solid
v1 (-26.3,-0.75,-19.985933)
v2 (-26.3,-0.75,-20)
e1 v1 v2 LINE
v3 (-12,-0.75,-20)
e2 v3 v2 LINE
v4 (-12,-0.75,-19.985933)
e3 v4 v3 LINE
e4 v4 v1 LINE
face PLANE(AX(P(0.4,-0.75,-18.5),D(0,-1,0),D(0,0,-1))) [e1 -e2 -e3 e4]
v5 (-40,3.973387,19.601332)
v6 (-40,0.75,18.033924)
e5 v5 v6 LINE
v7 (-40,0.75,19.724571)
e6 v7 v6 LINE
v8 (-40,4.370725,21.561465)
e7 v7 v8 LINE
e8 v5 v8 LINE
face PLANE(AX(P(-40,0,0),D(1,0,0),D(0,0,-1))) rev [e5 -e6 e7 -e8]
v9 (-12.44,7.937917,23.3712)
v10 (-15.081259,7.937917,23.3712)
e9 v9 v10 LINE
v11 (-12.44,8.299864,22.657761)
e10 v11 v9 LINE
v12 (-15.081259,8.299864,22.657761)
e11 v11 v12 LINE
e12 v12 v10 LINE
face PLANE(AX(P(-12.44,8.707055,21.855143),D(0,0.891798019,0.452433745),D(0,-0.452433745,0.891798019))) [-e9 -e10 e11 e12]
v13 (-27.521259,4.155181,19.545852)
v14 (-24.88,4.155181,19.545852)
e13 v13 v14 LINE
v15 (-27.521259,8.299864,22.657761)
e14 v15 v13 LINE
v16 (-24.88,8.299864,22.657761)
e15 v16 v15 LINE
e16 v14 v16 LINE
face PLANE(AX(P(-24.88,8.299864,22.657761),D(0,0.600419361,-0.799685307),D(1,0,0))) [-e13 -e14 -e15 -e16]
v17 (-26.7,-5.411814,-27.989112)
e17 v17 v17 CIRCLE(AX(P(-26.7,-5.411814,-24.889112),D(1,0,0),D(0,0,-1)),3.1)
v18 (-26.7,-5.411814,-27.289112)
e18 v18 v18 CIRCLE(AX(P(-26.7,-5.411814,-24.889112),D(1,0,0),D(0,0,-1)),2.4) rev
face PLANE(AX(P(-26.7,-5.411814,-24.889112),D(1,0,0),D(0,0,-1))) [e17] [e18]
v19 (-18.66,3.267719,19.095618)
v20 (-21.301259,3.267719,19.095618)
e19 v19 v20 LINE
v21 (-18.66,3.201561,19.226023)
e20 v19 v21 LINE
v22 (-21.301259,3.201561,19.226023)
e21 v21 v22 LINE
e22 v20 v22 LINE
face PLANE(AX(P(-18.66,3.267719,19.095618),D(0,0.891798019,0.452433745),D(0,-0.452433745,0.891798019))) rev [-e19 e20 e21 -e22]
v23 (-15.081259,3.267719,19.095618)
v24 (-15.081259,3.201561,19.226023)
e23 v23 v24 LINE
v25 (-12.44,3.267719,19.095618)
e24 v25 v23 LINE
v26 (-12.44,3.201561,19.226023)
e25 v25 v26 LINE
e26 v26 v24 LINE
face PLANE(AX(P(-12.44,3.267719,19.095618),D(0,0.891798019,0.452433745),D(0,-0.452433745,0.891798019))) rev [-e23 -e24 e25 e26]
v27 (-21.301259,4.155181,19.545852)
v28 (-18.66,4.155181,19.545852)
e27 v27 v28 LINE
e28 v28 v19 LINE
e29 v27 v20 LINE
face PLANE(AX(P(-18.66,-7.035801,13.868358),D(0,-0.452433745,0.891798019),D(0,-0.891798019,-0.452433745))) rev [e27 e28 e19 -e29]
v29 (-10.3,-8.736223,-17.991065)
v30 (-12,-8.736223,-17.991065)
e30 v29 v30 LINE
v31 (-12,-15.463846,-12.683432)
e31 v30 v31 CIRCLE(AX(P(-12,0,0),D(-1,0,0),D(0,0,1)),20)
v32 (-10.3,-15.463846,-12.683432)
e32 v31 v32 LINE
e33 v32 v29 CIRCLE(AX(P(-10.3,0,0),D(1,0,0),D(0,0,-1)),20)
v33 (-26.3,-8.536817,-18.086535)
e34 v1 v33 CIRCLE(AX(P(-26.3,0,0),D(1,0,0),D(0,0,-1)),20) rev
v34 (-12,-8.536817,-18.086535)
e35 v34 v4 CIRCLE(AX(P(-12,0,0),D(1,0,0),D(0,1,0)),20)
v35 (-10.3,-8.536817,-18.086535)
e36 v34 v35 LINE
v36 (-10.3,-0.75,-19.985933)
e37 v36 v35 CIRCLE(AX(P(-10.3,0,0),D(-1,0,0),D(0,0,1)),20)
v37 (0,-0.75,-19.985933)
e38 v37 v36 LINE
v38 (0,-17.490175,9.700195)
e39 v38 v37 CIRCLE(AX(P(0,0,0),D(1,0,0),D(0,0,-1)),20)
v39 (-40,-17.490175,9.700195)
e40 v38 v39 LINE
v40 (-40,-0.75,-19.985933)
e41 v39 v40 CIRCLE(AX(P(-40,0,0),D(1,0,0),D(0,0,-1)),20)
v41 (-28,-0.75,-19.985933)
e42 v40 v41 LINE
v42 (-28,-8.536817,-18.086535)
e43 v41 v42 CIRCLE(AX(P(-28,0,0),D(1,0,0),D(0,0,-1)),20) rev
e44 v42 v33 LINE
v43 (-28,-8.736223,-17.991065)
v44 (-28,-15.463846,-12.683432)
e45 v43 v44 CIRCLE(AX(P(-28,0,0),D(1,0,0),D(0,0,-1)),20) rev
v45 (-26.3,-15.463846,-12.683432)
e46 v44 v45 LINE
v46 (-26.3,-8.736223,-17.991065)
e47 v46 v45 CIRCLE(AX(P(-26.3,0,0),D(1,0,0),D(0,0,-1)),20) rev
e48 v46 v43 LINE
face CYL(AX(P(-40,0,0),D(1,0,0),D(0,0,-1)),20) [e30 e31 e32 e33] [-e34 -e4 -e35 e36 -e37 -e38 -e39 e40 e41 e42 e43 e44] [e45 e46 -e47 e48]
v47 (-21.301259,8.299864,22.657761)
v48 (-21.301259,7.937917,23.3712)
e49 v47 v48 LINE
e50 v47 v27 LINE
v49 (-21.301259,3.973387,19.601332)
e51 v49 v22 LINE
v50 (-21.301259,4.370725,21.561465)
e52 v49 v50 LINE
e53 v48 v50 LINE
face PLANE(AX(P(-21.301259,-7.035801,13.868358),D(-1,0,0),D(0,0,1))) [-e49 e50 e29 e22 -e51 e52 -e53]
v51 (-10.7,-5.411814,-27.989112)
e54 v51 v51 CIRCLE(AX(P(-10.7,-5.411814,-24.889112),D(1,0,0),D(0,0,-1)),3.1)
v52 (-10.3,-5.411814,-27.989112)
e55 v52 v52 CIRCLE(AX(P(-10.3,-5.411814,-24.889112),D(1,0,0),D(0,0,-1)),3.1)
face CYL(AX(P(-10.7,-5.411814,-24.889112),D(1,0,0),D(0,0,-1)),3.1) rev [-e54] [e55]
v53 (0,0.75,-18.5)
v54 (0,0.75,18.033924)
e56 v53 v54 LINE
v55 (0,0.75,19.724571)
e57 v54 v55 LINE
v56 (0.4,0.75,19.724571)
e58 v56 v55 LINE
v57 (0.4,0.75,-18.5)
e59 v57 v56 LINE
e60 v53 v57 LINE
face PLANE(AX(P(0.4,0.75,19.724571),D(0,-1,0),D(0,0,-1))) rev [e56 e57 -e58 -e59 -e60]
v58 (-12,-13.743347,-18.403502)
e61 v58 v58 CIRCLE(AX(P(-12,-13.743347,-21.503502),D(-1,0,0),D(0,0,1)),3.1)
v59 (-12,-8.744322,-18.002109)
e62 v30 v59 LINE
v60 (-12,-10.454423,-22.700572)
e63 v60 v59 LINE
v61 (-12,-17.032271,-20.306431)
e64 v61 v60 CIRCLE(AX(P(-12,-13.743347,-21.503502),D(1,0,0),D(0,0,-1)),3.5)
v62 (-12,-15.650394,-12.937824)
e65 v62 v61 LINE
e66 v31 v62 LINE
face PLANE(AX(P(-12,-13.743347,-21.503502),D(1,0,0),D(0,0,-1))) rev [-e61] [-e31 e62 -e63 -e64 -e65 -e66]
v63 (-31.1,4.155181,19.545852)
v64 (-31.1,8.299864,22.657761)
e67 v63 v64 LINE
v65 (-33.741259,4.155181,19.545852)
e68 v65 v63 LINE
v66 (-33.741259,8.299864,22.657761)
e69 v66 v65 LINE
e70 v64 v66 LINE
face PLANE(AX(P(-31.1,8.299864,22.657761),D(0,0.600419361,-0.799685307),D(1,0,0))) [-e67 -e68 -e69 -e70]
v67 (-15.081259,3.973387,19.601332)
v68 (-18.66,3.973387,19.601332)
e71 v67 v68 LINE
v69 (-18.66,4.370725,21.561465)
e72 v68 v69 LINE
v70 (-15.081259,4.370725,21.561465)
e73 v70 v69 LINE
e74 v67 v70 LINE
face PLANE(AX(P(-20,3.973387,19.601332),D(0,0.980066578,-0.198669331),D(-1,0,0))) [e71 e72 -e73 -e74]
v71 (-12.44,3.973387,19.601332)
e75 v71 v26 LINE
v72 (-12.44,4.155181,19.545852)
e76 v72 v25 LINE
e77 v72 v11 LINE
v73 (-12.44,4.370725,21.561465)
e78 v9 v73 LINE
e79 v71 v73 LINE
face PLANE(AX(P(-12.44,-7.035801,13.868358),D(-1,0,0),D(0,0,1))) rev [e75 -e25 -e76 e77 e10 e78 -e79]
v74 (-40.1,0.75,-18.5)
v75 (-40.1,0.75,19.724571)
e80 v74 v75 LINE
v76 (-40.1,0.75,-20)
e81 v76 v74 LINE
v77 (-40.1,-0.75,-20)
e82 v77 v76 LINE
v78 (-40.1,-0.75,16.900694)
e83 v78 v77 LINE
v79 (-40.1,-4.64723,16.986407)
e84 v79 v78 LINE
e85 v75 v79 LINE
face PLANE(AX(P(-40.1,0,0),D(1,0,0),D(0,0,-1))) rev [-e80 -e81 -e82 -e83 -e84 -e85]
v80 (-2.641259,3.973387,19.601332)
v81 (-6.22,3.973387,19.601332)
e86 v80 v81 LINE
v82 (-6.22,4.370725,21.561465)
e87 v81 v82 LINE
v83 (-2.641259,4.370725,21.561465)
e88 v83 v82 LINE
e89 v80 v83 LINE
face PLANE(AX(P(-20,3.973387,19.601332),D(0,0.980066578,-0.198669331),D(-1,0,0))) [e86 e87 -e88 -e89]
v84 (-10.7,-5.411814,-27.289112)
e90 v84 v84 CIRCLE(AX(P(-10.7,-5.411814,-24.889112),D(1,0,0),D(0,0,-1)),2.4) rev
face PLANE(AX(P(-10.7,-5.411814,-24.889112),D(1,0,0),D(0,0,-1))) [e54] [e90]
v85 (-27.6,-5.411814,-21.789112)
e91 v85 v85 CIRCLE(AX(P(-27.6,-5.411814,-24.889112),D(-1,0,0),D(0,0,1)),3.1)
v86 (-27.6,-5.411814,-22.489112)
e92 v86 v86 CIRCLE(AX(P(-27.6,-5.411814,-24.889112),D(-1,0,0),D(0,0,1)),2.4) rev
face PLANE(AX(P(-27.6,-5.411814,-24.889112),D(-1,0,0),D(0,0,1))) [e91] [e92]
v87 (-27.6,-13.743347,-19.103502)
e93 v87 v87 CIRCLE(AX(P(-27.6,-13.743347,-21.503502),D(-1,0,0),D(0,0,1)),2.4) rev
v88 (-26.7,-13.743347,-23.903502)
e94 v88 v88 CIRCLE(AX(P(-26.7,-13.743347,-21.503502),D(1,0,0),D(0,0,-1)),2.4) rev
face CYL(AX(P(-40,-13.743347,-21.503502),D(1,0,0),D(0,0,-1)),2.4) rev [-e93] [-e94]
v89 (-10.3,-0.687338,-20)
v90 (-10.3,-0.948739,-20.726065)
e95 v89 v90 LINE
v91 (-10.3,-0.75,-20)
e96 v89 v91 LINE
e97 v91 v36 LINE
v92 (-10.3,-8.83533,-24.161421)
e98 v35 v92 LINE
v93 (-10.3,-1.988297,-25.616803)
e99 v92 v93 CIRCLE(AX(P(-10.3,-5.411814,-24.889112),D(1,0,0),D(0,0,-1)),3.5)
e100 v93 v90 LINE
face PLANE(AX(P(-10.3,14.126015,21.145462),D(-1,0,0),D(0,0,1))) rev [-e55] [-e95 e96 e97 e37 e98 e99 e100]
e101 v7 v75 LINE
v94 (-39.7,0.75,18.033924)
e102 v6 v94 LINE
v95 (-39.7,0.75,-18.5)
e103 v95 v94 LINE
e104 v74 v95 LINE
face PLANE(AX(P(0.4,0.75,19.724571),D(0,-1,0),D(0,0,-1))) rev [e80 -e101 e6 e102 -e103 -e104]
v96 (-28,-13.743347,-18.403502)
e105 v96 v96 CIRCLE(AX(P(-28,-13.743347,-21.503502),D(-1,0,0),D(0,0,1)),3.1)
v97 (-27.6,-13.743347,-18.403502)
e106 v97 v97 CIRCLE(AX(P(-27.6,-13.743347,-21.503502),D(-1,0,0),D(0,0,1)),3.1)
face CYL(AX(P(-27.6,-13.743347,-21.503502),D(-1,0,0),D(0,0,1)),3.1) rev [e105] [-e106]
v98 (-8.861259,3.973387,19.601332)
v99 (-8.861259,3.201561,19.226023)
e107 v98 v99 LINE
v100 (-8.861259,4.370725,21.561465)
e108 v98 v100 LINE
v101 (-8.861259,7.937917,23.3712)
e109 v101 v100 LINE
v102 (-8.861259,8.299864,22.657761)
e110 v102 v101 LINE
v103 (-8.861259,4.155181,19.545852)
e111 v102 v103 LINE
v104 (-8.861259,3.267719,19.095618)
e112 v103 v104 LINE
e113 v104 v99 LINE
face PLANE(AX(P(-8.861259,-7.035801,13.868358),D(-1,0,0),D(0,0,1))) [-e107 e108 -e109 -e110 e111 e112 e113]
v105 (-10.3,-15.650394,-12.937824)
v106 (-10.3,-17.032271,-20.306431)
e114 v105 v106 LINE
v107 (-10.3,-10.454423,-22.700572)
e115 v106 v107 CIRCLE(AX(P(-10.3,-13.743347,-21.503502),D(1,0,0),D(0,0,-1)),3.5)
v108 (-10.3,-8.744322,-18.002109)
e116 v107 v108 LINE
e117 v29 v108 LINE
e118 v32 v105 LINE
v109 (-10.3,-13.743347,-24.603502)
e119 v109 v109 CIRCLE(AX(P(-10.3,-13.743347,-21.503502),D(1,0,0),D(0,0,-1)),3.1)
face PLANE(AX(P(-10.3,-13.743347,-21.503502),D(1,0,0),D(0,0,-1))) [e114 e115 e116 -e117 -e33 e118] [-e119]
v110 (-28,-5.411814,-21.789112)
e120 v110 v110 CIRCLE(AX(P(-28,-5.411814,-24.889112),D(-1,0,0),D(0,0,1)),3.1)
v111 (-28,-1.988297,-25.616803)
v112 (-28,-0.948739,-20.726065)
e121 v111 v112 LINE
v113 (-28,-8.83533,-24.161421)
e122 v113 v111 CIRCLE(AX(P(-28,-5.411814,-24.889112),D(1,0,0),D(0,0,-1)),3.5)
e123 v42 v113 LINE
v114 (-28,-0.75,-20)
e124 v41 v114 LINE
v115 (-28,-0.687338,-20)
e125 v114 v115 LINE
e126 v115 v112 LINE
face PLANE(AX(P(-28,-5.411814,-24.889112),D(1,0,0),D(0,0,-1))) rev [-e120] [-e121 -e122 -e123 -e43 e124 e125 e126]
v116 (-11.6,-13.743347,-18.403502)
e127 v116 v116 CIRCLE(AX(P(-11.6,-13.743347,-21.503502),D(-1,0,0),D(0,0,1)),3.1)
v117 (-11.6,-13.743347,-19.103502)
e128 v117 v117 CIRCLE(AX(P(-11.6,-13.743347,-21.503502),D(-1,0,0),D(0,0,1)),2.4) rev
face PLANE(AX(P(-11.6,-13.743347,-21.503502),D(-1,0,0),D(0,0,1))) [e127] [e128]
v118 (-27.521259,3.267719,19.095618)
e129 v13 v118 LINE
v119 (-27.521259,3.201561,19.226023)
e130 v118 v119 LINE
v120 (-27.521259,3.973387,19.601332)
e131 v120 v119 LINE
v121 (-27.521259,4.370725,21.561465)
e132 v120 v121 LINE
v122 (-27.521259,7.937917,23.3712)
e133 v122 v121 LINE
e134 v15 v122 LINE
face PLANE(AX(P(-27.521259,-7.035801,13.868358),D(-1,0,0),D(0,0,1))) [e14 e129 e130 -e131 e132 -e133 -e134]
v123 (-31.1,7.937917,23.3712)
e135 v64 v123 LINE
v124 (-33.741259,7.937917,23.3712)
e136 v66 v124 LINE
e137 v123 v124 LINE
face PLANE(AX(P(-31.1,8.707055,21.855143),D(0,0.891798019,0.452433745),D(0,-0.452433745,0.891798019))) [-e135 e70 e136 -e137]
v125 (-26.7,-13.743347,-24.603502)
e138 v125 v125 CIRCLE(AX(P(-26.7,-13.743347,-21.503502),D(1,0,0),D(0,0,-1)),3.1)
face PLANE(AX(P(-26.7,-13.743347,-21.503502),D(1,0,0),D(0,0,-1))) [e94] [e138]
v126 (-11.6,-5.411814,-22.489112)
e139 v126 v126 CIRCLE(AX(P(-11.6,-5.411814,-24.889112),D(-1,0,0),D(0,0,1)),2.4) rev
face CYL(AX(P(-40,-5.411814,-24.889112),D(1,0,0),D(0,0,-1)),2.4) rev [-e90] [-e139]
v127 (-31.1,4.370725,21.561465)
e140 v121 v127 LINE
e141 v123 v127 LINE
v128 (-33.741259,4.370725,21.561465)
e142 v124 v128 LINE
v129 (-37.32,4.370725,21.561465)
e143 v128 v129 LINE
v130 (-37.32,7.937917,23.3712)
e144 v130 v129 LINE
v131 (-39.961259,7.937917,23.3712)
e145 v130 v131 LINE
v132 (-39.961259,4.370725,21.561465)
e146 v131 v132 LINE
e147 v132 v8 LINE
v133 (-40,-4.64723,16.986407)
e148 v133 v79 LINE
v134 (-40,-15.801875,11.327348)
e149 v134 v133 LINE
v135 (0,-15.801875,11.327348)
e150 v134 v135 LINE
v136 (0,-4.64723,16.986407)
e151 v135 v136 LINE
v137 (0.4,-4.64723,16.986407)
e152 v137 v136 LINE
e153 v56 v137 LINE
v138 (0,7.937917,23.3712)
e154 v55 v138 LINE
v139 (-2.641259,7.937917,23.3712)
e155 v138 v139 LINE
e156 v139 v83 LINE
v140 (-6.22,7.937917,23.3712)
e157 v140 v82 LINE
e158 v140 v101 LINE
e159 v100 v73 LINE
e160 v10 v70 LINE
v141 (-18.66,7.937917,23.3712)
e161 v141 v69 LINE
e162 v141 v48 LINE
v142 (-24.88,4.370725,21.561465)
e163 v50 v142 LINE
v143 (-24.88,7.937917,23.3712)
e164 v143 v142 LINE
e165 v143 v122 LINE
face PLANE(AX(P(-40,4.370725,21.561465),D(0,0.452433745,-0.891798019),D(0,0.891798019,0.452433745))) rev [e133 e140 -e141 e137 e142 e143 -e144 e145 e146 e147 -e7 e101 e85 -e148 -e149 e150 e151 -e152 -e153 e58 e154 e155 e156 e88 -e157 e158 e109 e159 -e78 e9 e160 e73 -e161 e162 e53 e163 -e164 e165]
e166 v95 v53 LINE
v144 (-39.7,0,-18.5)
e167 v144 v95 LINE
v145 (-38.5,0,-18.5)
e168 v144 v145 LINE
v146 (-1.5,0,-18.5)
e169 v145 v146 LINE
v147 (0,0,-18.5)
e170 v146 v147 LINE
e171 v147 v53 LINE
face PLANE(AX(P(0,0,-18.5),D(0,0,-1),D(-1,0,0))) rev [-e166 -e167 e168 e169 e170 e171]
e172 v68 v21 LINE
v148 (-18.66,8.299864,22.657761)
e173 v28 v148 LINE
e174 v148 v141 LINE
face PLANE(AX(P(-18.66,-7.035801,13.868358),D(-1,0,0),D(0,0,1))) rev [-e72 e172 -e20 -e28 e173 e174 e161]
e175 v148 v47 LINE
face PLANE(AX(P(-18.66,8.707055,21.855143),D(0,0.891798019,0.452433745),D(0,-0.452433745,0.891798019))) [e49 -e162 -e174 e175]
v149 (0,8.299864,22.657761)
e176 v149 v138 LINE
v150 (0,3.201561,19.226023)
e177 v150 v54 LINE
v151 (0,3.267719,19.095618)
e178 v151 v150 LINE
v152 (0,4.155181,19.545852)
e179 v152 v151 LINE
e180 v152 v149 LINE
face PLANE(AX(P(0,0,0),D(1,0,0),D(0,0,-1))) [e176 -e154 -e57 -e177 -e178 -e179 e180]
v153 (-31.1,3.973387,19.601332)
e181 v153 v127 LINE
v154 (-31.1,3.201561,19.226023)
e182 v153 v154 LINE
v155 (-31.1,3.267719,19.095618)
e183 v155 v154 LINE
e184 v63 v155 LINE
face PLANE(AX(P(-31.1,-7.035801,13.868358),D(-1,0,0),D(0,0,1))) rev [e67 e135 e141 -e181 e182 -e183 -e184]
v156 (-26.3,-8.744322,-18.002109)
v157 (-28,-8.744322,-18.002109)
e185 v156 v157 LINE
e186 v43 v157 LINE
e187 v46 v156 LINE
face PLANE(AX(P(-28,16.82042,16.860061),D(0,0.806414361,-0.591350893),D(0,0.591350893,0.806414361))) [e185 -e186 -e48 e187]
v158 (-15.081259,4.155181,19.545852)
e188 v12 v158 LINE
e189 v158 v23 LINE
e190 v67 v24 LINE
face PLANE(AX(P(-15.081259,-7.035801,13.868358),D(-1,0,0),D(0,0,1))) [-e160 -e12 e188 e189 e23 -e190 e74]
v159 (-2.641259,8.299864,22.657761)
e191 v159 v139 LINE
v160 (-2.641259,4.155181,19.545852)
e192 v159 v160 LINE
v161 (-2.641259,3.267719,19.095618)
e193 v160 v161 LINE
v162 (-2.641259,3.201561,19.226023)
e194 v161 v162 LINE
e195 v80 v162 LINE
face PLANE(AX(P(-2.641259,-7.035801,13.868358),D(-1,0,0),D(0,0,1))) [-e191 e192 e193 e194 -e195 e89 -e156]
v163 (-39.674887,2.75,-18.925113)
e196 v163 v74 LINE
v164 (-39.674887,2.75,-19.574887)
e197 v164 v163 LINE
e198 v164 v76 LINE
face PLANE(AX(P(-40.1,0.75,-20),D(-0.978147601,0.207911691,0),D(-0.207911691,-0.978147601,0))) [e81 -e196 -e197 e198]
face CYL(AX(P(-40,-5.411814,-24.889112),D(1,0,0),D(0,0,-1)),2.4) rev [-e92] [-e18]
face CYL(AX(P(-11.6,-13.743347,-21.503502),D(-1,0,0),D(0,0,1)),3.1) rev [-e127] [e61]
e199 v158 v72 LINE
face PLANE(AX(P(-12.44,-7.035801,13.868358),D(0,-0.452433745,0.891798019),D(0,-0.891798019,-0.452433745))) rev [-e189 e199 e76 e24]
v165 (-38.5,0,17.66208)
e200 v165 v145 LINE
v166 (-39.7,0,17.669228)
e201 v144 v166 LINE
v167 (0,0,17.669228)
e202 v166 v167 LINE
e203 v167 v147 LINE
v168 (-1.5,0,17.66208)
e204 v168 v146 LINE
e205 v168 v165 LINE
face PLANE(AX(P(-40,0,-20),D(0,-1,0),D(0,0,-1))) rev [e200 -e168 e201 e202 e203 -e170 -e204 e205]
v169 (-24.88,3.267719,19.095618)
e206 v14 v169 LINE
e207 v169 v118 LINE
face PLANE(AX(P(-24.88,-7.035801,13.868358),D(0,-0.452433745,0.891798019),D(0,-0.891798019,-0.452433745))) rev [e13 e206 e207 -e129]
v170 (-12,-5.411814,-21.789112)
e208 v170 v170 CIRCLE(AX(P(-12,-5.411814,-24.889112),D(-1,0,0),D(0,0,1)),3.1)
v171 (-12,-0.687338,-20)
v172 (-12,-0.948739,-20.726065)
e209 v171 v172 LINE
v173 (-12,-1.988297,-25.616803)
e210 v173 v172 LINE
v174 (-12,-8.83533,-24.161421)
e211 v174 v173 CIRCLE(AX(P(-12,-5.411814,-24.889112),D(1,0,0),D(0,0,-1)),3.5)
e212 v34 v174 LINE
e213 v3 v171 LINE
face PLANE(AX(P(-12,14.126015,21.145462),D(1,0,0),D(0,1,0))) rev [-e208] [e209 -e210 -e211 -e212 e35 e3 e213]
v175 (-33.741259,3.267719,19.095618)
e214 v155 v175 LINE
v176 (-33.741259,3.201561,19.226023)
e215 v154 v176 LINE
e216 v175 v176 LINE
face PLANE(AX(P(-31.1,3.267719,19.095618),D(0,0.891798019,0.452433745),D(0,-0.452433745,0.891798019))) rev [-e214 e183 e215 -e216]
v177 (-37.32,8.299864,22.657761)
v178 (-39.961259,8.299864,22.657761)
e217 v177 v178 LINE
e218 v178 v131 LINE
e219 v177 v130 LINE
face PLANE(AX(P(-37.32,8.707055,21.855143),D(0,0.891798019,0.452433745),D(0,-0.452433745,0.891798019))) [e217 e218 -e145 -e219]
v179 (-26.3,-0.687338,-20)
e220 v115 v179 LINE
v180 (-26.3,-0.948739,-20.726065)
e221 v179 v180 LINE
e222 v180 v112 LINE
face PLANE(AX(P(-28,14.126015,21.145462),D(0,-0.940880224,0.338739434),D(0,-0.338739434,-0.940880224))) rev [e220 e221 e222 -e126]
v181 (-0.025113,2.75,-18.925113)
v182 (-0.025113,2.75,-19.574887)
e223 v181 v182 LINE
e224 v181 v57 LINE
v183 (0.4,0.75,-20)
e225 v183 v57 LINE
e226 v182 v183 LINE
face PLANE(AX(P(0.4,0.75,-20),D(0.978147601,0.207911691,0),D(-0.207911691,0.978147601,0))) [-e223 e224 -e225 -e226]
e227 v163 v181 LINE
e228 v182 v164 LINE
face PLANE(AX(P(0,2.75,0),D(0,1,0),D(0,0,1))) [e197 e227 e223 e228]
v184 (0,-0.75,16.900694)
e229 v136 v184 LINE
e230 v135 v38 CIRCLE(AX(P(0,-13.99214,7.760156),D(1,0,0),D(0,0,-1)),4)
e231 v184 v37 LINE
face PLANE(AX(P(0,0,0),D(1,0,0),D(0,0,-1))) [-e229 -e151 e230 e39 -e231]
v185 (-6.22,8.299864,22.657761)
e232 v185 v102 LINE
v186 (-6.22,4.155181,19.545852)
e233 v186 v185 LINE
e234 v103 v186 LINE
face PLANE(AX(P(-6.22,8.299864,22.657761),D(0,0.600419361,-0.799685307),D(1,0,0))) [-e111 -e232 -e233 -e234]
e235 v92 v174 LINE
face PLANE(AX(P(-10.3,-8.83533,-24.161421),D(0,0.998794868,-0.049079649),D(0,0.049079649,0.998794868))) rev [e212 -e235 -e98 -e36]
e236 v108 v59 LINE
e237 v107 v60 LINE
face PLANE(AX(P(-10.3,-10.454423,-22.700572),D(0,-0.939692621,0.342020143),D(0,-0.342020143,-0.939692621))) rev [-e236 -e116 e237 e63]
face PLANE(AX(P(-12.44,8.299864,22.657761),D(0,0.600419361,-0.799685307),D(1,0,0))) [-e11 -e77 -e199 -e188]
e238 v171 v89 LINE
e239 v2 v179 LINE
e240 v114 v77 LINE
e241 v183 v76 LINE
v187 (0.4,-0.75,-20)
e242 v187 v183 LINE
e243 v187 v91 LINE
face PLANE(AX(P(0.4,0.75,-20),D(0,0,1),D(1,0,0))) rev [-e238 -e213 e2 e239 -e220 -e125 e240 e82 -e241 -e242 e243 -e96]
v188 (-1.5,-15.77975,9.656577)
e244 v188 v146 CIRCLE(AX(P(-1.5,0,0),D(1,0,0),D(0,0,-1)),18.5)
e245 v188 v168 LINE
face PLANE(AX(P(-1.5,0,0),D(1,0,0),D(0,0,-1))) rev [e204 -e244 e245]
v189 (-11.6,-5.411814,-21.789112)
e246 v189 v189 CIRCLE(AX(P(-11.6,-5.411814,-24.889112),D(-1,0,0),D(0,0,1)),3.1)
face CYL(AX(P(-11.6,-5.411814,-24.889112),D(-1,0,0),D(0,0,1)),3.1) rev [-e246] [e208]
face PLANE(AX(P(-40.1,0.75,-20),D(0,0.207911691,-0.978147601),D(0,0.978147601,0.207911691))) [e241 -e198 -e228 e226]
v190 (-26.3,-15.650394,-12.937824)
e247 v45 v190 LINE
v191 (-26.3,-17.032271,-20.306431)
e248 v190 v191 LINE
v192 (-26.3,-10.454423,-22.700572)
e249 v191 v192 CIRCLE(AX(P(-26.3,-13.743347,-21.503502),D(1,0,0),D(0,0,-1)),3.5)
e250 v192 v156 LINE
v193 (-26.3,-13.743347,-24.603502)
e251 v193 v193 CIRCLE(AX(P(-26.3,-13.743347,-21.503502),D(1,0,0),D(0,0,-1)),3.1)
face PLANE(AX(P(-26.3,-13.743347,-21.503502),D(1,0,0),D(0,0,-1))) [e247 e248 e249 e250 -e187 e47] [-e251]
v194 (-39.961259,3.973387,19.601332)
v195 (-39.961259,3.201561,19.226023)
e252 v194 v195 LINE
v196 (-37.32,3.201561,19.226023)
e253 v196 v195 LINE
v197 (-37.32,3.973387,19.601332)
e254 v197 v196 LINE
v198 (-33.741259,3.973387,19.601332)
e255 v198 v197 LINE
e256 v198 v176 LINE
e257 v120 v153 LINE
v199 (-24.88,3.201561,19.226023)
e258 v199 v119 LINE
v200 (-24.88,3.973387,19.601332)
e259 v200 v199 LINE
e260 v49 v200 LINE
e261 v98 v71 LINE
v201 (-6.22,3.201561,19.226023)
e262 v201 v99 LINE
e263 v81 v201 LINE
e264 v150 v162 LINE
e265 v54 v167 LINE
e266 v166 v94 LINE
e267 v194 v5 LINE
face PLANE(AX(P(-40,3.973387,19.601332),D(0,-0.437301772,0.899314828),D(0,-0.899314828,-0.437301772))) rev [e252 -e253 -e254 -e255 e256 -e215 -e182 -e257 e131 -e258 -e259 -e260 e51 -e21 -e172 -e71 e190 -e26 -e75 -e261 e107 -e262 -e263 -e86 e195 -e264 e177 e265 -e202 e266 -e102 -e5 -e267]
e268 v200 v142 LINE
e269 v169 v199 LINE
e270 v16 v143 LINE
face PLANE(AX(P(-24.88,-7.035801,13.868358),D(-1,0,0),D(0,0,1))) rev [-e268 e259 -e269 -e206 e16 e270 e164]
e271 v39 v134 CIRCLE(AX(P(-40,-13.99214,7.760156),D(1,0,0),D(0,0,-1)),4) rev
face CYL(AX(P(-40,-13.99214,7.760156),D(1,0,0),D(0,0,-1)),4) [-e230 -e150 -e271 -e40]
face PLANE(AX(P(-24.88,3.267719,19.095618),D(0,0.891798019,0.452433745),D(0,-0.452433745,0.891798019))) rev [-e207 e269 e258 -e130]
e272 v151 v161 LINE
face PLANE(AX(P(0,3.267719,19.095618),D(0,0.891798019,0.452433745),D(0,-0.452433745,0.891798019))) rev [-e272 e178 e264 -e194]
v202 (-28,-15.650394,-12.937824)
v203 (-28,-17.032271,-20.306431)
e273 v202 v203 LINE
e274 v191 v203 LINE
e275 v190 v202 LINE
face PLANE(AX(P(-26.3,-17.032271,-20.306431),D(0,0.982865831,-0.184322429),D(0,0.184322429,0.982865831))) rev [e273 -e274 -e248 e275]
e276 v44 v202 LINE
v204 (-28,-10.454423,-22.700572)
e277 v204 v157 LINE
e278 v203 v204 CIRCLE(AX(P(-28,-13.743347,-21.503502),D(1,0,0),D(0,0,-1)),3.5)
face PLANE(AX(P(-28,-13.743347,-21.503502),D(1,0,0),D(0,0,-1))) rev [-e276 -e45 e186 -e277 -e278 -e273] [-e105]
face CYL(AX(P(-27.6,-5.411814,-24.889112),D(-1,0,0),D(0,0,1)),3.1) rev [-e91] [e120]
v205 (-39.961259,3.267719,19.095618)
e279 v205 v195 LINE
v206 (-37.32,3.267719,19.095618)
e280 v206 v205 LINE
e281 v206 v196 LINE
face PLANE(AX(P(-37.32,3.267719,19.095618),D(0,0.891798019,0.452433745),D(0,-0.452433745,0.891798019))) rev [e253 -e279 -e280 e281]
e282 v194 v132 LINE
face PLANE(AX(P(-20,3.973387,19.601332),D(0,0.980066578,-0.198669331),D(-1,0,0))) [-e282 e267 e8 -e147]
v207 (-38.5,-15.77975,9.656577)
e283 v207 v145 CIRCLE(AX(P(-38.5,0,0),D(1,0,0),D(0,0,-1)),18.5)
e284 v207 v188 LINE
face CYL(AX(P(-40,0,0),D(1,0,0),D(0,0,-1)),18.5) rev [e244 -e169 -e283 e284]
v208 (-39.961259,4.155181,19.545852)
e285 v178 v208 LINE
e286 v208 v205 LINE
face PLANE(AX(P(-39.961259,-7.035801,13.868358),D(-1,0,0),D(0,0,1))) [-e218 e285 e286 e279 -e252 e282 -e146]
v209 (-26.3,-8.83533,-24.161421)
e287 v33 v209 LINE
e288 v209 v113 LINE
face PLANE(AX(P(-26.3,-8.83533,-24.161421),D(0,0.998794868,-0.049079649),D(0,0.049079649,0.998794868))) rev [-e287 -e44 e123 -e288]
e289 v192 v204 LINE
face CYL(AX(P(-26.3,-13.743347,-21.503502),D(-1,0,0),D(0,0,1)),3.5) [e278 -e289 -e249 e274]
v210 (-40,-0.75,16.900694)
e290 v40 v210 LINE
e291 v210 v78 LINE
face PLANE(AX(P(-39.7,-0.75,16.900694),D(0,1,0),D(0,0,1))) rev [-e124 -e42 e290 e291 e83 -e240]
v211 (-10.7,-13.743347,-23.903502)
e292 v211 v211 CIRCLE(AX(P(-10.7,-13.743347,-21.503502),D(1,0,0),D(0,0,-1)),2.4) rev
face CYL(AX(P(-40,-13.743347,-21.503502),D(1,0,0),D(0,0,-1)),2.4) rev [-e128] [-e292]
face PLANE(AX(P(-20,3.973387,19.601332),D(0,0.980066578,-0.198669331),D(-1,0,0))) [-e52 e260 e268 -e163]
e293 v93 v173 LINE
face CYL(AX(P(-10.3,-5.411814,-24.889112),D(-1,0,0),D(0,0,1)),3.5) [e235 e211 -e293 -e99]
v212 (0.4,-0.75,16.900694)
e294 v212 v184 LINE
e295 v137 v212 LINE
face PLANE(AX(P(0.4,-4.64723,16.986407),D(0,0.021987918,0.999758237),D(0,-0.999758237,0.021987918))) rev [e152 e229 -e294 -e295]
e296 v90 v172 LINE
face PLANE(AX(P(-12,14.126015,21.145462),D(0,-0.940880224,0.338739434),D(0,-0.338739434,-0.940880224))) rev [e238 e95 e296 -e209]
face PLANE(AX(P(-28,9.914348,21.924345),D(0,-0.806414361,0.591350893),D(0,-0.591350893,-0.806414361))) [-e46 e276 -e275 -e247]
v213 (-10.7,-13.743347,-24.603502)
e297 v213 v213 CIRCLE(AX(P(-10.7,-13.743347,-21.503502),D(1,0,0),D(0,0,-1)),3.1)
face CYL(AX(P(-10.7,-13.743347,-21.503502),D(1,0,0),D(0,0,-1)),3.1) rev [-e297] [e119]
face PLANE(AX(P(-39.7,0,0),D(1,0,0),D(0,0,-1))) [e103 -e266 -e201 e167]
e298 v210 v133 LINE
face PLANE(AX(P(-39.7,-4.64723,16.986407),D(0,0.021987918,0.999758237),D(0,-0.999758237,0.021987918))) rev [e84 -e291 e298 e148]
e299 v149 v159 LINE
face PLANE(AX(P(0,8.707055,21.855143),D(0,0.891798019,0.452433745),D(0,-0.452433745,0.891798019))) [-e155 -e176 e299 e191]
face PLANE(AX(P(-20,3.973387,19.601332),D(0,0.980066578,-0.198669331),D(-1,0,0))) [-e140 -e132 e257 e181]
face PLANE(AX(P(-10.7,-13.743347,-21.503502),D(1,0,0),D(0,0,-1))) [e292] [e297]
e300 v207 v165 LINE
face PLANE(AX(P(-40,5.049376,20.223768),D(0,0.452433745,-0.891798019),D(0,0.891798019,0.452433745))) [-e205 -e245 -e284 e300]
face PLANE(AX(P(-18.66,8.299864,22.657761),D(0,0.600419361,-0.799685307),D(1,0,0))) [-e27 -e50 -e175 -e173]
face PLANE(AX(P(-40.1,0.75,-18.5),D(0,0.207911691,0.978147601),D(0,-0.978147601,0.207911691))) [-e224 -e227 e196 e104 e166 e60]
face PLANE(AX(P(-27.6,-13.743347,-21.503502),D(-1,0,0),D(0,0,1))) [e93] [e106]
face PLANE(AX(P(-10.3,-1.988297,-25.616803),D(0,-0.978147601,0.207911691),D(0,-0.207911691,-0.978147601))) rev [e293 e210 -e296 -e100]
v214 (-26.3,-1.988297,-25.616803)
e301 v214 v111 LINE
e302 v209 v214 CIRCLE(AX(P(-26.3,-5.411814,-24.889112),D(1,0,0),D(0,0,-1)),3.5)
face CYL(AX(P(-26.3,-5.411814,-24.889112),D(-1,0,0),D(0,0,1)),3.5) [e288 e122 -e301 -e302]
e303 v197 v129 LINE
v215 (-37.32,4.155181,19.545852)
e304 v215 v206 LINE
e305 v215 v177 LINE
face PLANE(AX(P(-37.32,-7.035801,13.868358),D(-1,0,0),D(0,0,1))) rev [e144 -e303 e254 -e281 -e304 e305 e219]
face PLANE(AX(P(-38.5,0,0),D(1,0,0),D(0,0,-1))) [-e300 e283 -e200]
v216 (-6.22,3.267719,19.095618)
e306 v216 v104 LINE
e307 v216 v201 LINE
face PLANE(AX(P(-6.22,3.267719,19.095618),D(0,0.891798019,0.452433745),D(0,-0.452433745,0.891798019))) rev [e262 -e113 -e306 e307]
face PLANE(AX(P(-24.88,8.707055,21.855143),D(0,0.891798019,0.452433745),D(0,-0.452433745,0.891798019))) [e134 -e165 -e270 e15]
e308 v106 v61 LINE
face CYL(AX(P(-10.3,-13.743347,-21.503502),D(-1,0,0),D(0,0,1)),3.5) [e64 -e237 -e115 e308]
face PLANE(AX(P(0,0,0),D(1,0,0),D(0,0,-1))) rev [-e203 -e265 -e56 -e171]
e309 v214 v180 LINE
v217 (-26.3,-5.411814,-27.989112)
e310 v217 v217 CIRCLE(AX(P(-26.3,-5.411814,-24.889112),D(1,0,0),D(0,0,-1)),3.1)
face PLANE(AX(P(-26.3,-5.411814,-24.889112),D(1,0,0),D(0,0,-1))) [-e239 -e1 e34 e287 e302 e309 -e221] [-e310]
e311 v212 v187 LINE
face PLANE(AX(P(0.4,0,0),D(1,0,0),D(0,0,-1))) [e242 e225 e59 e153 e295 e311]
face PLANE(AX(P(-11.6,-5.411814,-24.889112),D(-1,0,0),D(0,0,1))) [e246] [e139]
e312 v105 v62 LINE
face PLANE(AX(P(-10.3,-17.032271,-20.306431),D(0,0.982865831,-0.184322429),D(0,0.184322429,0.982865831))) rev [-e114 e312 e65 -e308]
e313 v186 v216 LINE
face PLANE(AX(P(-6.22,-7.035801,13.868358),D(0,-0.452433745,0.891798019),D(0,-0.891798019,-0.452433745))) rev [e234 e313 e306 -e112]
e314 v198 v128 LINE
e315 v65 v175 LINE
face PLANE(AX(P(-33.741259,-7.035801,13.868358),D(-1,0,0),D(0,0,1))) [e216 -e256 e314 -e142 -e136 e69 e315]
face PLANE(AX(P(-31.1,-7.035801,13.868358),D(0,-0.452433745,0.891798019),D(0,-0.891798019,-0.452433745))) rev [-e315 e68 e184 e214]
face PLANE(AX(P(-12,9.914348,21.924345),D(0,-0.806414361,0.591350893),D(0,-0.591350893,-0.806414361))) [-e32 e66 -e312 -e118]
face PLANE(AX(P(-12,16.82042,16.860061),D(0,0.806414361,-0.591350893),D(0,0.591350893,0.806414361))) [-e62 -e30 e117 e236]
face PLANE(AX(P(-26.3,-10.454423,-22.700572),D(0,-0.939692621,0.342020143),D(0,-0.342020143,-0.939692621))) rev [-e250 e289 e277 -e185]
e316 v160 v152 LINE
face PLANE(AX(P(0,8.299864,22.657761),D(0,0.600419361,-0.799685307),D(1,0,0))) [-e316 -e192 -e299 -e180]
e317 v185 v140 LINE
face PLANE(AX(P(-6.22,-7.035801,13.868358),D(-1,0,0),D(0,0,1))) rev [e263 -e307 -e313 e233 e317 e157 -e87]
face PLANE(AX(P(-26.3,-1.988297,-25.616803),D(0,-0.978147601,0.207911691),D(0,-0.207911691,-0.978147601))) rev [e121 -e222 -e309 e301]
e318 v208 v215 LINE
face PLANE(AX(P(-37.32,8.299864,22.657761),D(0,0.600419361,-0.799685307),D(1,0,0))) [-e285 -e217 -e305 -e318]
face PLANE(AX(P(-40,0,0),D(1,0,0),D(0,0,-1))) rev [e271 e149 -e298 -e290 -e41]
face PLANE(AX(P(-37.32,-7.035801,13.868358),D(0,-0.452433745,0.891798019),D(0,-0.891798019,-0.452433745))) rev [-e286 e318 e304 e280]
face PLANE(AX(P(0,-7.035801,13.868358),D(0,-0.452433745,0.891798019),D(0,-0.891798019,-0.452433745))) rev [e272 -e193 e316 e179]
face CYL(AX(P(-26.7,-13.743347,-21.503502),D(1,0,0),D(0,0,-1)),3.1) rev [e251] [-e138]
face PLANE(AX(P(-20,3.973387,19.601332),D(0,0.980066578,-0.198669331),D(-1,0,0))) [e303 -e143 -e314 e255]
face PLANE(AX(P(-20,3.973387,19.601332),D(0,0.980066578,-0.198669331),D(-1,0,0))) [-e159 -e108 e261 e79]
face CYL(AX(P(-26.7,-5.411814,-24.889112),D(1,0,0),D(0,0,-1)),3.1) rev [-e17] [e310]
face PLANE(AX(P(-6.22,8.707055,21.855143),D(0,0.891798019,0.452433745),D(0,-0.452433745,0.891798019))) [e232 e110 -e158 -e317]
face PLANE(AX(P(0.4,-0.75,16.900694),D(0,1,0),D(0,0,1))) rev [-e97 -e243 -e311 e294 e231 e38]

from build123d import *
from OCP.BRepFilletAPI import BRepFilletAPI_MakeChamfer

# Parameters (mm, degrees)
SKETCH1_R                    = 20
BOSS_EXTRUDE1_DEPTH          = 40
WRAP6_SECTION_W              = 2
WRAP6_SECTION_H              = 40
WRAP6_ANGLE                  = 68.754935416
CUT_EXTRUDE3_DEPTH           = 40
CUT_EXTRUDE4_DEPTH           = 40
SHELL1_START                 = -38.5
SHELL1_DEPTH                 = 37
BOSS_EXTRUDE6_DEPTH          = 1.7
CHAMFER3_SIZE2               = 5.104153638
CHAMFER3_SIZE                = 0.9
LPATTERN3_COUNT              = 7
LPATTERN3_PITCH              = 6.22
CHAMFER3_OF_LPATTERN3_SIZE   = 0.9
CHAMFER3_OF_LPATTERN3_SIZE_2 = 5.104153638
BOSS_EXTRUDE9_DEPTH          = 1.7
BOSS_EXTRUDE10_DEPTH         = 1.7
BOSS_EXTRUDE11_REACH         = 61.927
BOSS_EXTRUDE11_END_RADIUS    = 20
SKETCH26_W                   = 1.7
SKETCH26_H                   = 8.060132267
BOSS_EXTRUDE12_REACH         = 61.482
BOSS_EXTRUDE12_END_RADIUS    = 20
SKETCH31_W                   = 1.7
SKETCH31_H                   = 8.563925154
SKETCH35_R                   = 2.4
CUT_EXTRUDE5_DEPTH           = 46.6949855
SKETCH36_R                   = 3.1
CUT_EXTRUDE6_DEPTH           = 0.4
CUT_EXTRUDE7_START           = -0.4
SKETCH37_R                   = 3.1
CUT_EXTRUDE7_DEPTH           = 0.4
LPATTERN4_COUNT              = 2
LPATTERN4_PITCH              = 16
FILLET1_R                    = 4
BOSS_EXTRUDE13_DEPTH         = 0.4
LPATTERN5_COUNT              = 2
LPATTERN5_PITCH              = 40.1
SKETCH39_W                   = 40.5
SKETCH39_H                   = 1.5
BOSS_EXTRUDE14_DEPTH         = 1.5
SKETCH40_W                   = 40.5
SKETCH40_H                   = 1.5
BOSS_EXTRUDE15_DEPTH         = 2
BOSS_EXTRUDE15_TAPER         = 12


# Read off the part's stored shape, not the designer's step: Shell1
with BuildPart() as part:
    # Sketch1 → Boss-Extrude1 (new body)
    with BuildSketch(Plane(origin=(0, 0, 0), x_dir=(0, 0, -1), z_dir=(1, 0, 0))):
        Circle(SKETCH1_R)
    extrude(amount=-BOSS_EXTRUDE1_DEPTH)

    # Wrap6 section (on wrap section) → Wrap6 (revolve)
    with BuildSketch(Plane(origin=(0, 0, 0), x_dir=(0, 0.19866933079506122, 0.9800665778412416), z_dir=(0, 0.9800665778412416, -0.19866933079506122))):
        with Locations((21, -20)):
            Rectangle(WRAP6_SECTION_W, WRAP6_SECTION_H)
    revolve(axis=Axis((0, 0, 0), (1, 0, 0)), revolution_arc=WRAP6_ANGLE)

    # Sketch7 → Cut-Extrude3 (cut)
    with BuildSketch(Plane(origin=(0, 0, 0), x_dir=(0, 0, -1), z_dir=(1, 0, 0))):
        Polygon((-21.561464713, 4.370725277), (-10.806046117, -16.829419696), (-13.2224557, -32.299256077), (-33.361013034, 4.370725277), align=None)
    extrude(amount=-CUT_EXTRUDE3_DEPTH, mode=Mode.SUBTRACT)

    # Sketch8 → Cut-Extrude4 (cut)
    with BuildSketch(Plane(origin=(0, 0, 0), x_dir=(0, 0, -1), z_dir=(1, 0, 0))):
        with BuildLine():
            Line((-19.601331557, 3.973386616), (-17.669228411, 0))
            Line((-17.669228411, 0), (20, 0))
            ThreePointArc((20, 0), (1.996668333, 19.900083306), (-19.601331557, 3.973386616))
        make_face()
    extrude(amount=-CUT_EXTRUDE4_DEPTH, mode=Mode.SUBTRACT)

    # Shell1 outline → Shell1 (cut)
    with BuildSketch(Plane.YZ.offset(SHELL1_START)):
        with BuildLine():
            Line((0, 17.662079948), (-15.779750214, 9.656577198))
            ThreePointArc((-15.779750214, 9.656577198), (-16.138411913, -9.044427064), (0, -18.5))
            Line((0, -18.5), (0, 17.662079948))
        make_face()
    extrude(amount=SHELL1_DEPTH, mode=Mode.SUBTRACT)

    # Sketch17 → Boss-Extrude6 (add)
    with BuildSketch(Plane(origin=(0, -7.804938117, 15.384414667), x_dir=(1, 0, 0), z_dir=(0, -0.4524337453692514, 0.8917980186405168))):
        Polygon((-2.641259026, 11.553646958), (0, 11.553646958), (0, 13.652938378), (0, 17.652938378), (-2.641259026, 17.652938378), align=None)
    boss_extrude6 = extrude(amount=-BOSS_EXTRUDE6_DEPTH)

    # Chamfer3
    chamfer3_edges = [part.edges().sort_by_distance(p)[0] for p in [
        (-1.320629513, 8.707054719, 21.855143062),
    ]]
    chamfer3_side = [part.faces().sort_by_distance(p)[0] for p in [
        (-1.320629513, 8.698910912, 21.871195427),
    ]]
    chamfer(chamfer3_edges, length=CHAMFER3_SIZE - 0.0001, length2=CHAMFER3_SIZE2 - 0.0001, reference=chamfer3_side[0])  # a hair under: the kernel refuses the full size

    # LPattern3: Boss-Extrude6 ×7
    with Locations(*[(-i * LPATTERN3_PITCH, 0, 0) for i in range(1, LPATTERN3_COUNT)]):
        add(boss_extrude6)

    # Chamfer3 of LPattern3
    chamfer3_of_lpattern3_edges_1 = [part.edges().sort_by_distance(p)[0] for p in [
        (-7.540629513, 8.707054719, 21.855143062),
    ]]
    chamfer3_of_lpattern3_side_1 = [part.faces().sort_by_distance(p)[0] for p in [
        (-7.540629513, 8.698910912, 21.871195427),
    ]]
    chamfer3_of_lpattern3_edges_2 = [part.edges().sort_by_distance(p)[0] for p in [
        (-13.760629513, 8.707054719, 21.855143062),
    ]]
    chamfer3_of_lpattern3_side_2 = [part.faces().sort_by_distance(p)[0] for p in [
        (-13.760629513, 8.698910912, 21.871195427),
    ]]
    chamfer3_of_lpattern3_edges_3 = [part.edges().sort_by_distance(p)[0] for p in [
        (-19.980629513, 8.707054719, 21.855143062),
    ]]
    chamfer3_of_lpattern3_side_3 = [part.faces().sort_by_distance(p)[0] for p in [
        (-19.980629513, 8.698910912, 21.871195427),
    ]]
    chamfer3_of_lpattern3_edges_4 = [part.edges().sort_by_distance(p)[0] for p in [
        (-26.200629513, 8.707054719, 21.855143062),
    ]]
    chamfer3_of_lpattern3_side_4 = [part.faces().sort_by_distance(p)[0] for p in [
        (-26.200629513, 8.698910912, 21.871195427),
    ]]
    chamfer3_of_lpattern3_edges_5 = [part.edges().sort_by_distance(p)[0] for p in [
        (-32.420629513, 8.707054719, 21.855143062),
    ]]
    chamfer3_of_lpattern3_side_5 = [part.faces().sort_by_distance(p)[0] for p in [
        (-32.420629513, 8.698910912, 21.871195427),
    ]]
    chamfer3_of_lpattern3_edges_6 = [part.edges().sort_by_distance(p)[0] for p in [
        (-38.640629513, 8.707054719, 21.855143062),
    ]]
    chamfer3_of_lpattern3_side_6 = [part.faces().sort_by_distance(p)[0] for p in [
        (-38.640629513, 8.691002355, 21.846999255),
    ]]
    chamfer3_of_lpattern3 = BRepFilletAPI_MakeChamfer(part.part.solid().wrapped)
    for e in chamfer3_of_lpattern3_edges_1:
        chamfer3_of_lpattern3.Add(CHAMFER3_OF_LPATTERN3_SIZE - 0.0001, CHAMFER3_OF_LPATTERN3_SIZE_2 - 0.0001, e.wrapped, chamfer3_of_lpattern3_side_1[0].wrapped)
    for e in chamfer3_of_lpattern3_edges_2:
        chamfer3_of_lpattern3.Add(CHAMFER3_OF_LPATTERN3_SIZE - 0.0001, CHAMFER3_OF_LPATTERN3_SIZE_2 - 0.0001, e.wrapped, chamfer3_of_lpattern3_side_2[0].wrapped)
    for e in chamfer3_of_lpattern3_edges_3:
        chamfer3_of_lpattern3.Add(CHAMFER3_OF_LPATTERN3_SIZE - 0.0001, CHAMFER3_OF_LPATTERN3_SIZE_2 - 0.0001, e.wrapped, chamfer3_of_lpattern3_side_3[0].wrapped)
    for e in chamfer3_of_lpattern3_edges_4:
        chamfer3_of_lpattern3.Add(CHAMFER3_OF_LPATTERN3_SIZE - 0.0001, CHAMFER3_OF_LPATTERN3_SIZE_2 - 0.0001, e.wrapped, chamfer3_of_lpattern3_side_4[0].wrapped)
    for e in chamfer3_of_lpattern3_edges_5:
        chamfer3_of_lpattern3.Add(CHAMFER3_OF_LPATTERN3_SIZE - 0.0001, CHAMFER3_OF_LPATTERN3_SIZE_2 - 0.0001, e.wrapped, chamfer3_of_lpattern3_side_5[0].wrapped)
    for e in chamfer3_of_lpattern3_edges_6:
        chamfer3_of_lpattern3.Add(CHAMFER3_OF_LPATTERN3_SIZE_2 - 0.0001, CHAMFER3_OF_LPATTERN3_SIZE - 0.0001, e.wrapped, chamfer3_of_lpattern3_side_6[0].wrapped)
    add(Compound.cast(chamfer3_of_lpattern3.Shape()), mode=Mode.REPLACE)  # a hair under: the kernel refuses the full size



with BuildPart() as body_2:
    # Sketch18 → Boss-Extrude9 (new body)
    with BuildSketch(Plane(origin=(-12, 9.40212228, -3.028508389), x_dir=(0, -0.20791169081773309, -0.9781476007338114), z_dir=(1, 0, 0))):
        with BuildLine():
            Line((24.462887784, -6.44514078), (19.462887784, -6.44514078))
            Line((19.462887784, -6.44514078), (18.368989474, -14.430697657))
            Line((18.368989474, -14.430697657), (24.462887784, -13.44514078))
            ThreePointArc((24.462887784, -13.44514078), (27.962887784, -9.94514078), (24.462887784, -6.44514078))
        make_face()
    boss_extrude9 = extrude(amount=BOSS_EXTRUDE9_DEPTH)


with BuildPart() as body_3:
    # Sketch23 → Boss-Extrude10 (new body)
    with BuildSketch(Plane(origin=(-12, 6.645607303, -3.623209558), x_dir=(0, -0.3420201433256566, -0.9396926207859128), z_dir=(1, 0, 0))):
        with BuildLine():
            Line((23.775411733, -9.543929755), (18.775411733, -9.543929755))
            Line((18.775411733, -9.543929755), (16.378556498, -17.765602275))
            Line((16.378556498, -17.765602275), (23.775411733, -16.543929755))
            ThreePointArc((23.775411733, -16.543929755), (27.275411733, -13.043929755), (23.775411733, -9.543929755))
        make_face()
    boss_extrude10 = extrude(amount=BOSS_EXTRUDE10_DEPTH)


with BuildPart() as part_1:
    add(part.part)

    add(body_2.part)  # Boss-Extrude11 merges body 2
    # Boss-Extrude11: up to this cylinder (the profile starts outside it)
    boss_extrude11_end = Plane(origin=(-11.15, 0, 0), z_dir=(1, 0, 0)) * Cylinder(BOSS_EXTRUDE11_END_RADIUS, 164.854, mode=Mode.PRIVATE)
    # Sketch26 → Boss-Extrude11 (add, up to the surface)
    with BuildSketch(Plane(origin=(0, -6.71453374, -18.65024081), x_dir=(1, 0, 0), z_dir=(0, 0.3387394336586716, 0.9408802240905069)), mode=Mode.PRIVATE) as boss_extrude11_sk1:
        with Locations((-11.15, 2.098020073)):
            Rectangle(SKETCH26_W, SKETCH26_H)
    boss_extrude11_tool1 = extrude(boss_extrude11_sk1.sketch, amount=BOSS_EXTRUDE11_REACH, mode=Mode.PRIVATE) - boss_extrude11_end
    boss_extrude11 = boss_extrude11_tool1.solids().sort_by_distance((-11.15, -4.740548, -19.360923))[0]
    add(boss_extrude11)


    add(body_3.part)  # Boss-Extrude12 merges body 3
    # Boss-Extrude12: up to this cylinder (the profile starts outside it)
    boss_extrude12_end = Plane(origin=(-11.15, 0, 0), z_dir=(1, 0, 0)) * Cylinder(BOSS_EXTRUDE12_END_RADIUS, 163.964, mode=Mode.PRIVATE)
    # Sketch31 → Boss-Extrude12 (add, up to the surface)
    with BuildSketch(Plane(origin=(0, -11.64258856, -15.876784348), x_dir=(-1, 0, 0), z_dir=(0, -0.5913508934195582, -0.8064143605193862)), mode=Mode.PRIVATE) as boss_extrude12_sk1:
        with Locations((11.15, -0.687946115)):
            Rectangle(SKETCH31_W, SKETCH31_H)
    boss_extrude12_tool1 = extrude(boss_extrude12_sk1.sketch, amount=-BOSS_EXTRUDE12_REACH, mode=Mode.PRIVATE) - boss_extrude12_end
    boss_extrude12 = boss_extrude12_tool1.solids().sort_by_distance((-11.15, -12.197358, -15.469967))[0] + boss_extrude12_tool1.solids().sort_by_distance((-11.15, -12.197358, -15.469967))[1]
    add(boss_extrude12)

    # Sketch35 → Cut-Extrude5 (cut, through all)
    with BuildSketch(Plane(origin=(-10.3, 0, 0), x_dir=(0, 0, -1), z_dir=(1, 0, 0))):
        with Locations((24.889112346, -5.411813674)):
            Circle(SKETCH35_R)
        with Locations((21.503501796, -13.743346963)):
            Circle(SKETCH35_R)
    cut_extrude5 = extrude(amount=-CUT_EXTRUDE5_DEPTH, mode=Mode.SUBTRACT)

    # Sketch36 → Cut-Extrude6 (cut)
    with BuildSketch(Plane(origin=(-10.3, 0, 0), x_dir=(0, 0, -1), z_dir=(1, 0, 0))):
        with Locations((24.889112346, -5.411813674)):
            Circle(SKETCH36_R)
        with Locations((21.503501796, -13.743346963)):
            Circle(SKETCH36_R)
    cut_extrude6 = extrude(amount=-CUT_EXTRUDE6_DEPTH, mode=Mode.SUBTRACT)

    # Sketch37 → Cut-Extrude7 (cut)
    with BuildSketch(Plane.ZY.offset(12).offset(CUT_EXTRUDE7_START)):
        with Locations(Location((-24.889112346, -5.411813674, 0), (0, 0, 180))):
            Circle(SKETCH37_R)
        with Locations(Location((-21.503501796, -13.743346963, 0), (0, 0, 180))):
            Circle(SKETCH37_R)
    cut_extrude7 = extrude(amount=CUT_EXTRUDE7_DEPTH, mode=Mode.SUBTRACT)

    # LPattern4: Boss-Extrude9, Boss-Extrude10, Boss-Extrude11, Boss-Extrude12, Cut-Extrude5, Cut-Extrude6, Cut-Extrude7 ×2
    with Locations(*[(-i * LPATTERN4_PITCH, 0, 0) for i in range(1, LPATTERN4_COUNT)]):
        add(boss_extrude9)
        add(boss_extrude10)
        add(boss_extrude11)
        add(boss_extrude12)
        add(cut_extrude5, mode=Mode.SUBTRACT)
        add(cut_extrude6, mode=Mode.SUBTRACT)
        add(cut_extrude7, mode=Mode.SUBTRACT)

    # Fillet1
    fillet1_edges = [part_1.edges().sort_by_distance(p)[0] for p in [
        (-20, -16.829419696, 10.806046117),
    ]]
    fillet(fillet1_edges, radius=FILLET1_R)

    # Sketch38 → Boss-Extrude13 (add)
    with BuildSketch(Plane(origin=(0, 0, 0), x_dir=(0, 0, -1), z_dir=(1, 0, 0))):
        Polygon((-19.72457086, 0.75), (20, 0.75), (20, -0.75), (-16.900694448, -0.75), (-16.986407143, -4.647229987), align=None)
    boss_extrude13 = extrude(amount=BOSS_EXTRUDE13_DEPTH)

    # LPattern5: Boss-Extrude13 ×2
    with Locations(*[(-i * LPATTERN5_PITCH, 0, 0) for i in range(1, LPATTERN5_COUNT)]):
        add(boss_extrude13)

    # Sketch39 → Boss-Extrude14 (add)
    with BuildSketch(Plane(origin=(0, 0, -20), x_dir=(-1, 0, 0), z_dir=(0, 0, -1))):
        with Locations((19.85, 0)):
            Rectangle(SKETCH39_W, SKETCH39_H)
    extrude(amount=-BOSS_EXTRUDE14_DEPTH)

    # Sketch40 → Boss-Extrude15 (add)
    with BuildSketch(Plane(origin=(0, 0.75, 0), x_dir=(1, 0, 0), z_dir=(0, 1, 0))):
        with Locations((-19.85, 19.25)):
            Rectangle(SKETCH40_W, SKETCH40_H)
    extrude(amount=BOSS_EXTRUDE15_DEPTH, taper=BOSS_EXTRUDE15_TAPER)


solid = part_1.part
